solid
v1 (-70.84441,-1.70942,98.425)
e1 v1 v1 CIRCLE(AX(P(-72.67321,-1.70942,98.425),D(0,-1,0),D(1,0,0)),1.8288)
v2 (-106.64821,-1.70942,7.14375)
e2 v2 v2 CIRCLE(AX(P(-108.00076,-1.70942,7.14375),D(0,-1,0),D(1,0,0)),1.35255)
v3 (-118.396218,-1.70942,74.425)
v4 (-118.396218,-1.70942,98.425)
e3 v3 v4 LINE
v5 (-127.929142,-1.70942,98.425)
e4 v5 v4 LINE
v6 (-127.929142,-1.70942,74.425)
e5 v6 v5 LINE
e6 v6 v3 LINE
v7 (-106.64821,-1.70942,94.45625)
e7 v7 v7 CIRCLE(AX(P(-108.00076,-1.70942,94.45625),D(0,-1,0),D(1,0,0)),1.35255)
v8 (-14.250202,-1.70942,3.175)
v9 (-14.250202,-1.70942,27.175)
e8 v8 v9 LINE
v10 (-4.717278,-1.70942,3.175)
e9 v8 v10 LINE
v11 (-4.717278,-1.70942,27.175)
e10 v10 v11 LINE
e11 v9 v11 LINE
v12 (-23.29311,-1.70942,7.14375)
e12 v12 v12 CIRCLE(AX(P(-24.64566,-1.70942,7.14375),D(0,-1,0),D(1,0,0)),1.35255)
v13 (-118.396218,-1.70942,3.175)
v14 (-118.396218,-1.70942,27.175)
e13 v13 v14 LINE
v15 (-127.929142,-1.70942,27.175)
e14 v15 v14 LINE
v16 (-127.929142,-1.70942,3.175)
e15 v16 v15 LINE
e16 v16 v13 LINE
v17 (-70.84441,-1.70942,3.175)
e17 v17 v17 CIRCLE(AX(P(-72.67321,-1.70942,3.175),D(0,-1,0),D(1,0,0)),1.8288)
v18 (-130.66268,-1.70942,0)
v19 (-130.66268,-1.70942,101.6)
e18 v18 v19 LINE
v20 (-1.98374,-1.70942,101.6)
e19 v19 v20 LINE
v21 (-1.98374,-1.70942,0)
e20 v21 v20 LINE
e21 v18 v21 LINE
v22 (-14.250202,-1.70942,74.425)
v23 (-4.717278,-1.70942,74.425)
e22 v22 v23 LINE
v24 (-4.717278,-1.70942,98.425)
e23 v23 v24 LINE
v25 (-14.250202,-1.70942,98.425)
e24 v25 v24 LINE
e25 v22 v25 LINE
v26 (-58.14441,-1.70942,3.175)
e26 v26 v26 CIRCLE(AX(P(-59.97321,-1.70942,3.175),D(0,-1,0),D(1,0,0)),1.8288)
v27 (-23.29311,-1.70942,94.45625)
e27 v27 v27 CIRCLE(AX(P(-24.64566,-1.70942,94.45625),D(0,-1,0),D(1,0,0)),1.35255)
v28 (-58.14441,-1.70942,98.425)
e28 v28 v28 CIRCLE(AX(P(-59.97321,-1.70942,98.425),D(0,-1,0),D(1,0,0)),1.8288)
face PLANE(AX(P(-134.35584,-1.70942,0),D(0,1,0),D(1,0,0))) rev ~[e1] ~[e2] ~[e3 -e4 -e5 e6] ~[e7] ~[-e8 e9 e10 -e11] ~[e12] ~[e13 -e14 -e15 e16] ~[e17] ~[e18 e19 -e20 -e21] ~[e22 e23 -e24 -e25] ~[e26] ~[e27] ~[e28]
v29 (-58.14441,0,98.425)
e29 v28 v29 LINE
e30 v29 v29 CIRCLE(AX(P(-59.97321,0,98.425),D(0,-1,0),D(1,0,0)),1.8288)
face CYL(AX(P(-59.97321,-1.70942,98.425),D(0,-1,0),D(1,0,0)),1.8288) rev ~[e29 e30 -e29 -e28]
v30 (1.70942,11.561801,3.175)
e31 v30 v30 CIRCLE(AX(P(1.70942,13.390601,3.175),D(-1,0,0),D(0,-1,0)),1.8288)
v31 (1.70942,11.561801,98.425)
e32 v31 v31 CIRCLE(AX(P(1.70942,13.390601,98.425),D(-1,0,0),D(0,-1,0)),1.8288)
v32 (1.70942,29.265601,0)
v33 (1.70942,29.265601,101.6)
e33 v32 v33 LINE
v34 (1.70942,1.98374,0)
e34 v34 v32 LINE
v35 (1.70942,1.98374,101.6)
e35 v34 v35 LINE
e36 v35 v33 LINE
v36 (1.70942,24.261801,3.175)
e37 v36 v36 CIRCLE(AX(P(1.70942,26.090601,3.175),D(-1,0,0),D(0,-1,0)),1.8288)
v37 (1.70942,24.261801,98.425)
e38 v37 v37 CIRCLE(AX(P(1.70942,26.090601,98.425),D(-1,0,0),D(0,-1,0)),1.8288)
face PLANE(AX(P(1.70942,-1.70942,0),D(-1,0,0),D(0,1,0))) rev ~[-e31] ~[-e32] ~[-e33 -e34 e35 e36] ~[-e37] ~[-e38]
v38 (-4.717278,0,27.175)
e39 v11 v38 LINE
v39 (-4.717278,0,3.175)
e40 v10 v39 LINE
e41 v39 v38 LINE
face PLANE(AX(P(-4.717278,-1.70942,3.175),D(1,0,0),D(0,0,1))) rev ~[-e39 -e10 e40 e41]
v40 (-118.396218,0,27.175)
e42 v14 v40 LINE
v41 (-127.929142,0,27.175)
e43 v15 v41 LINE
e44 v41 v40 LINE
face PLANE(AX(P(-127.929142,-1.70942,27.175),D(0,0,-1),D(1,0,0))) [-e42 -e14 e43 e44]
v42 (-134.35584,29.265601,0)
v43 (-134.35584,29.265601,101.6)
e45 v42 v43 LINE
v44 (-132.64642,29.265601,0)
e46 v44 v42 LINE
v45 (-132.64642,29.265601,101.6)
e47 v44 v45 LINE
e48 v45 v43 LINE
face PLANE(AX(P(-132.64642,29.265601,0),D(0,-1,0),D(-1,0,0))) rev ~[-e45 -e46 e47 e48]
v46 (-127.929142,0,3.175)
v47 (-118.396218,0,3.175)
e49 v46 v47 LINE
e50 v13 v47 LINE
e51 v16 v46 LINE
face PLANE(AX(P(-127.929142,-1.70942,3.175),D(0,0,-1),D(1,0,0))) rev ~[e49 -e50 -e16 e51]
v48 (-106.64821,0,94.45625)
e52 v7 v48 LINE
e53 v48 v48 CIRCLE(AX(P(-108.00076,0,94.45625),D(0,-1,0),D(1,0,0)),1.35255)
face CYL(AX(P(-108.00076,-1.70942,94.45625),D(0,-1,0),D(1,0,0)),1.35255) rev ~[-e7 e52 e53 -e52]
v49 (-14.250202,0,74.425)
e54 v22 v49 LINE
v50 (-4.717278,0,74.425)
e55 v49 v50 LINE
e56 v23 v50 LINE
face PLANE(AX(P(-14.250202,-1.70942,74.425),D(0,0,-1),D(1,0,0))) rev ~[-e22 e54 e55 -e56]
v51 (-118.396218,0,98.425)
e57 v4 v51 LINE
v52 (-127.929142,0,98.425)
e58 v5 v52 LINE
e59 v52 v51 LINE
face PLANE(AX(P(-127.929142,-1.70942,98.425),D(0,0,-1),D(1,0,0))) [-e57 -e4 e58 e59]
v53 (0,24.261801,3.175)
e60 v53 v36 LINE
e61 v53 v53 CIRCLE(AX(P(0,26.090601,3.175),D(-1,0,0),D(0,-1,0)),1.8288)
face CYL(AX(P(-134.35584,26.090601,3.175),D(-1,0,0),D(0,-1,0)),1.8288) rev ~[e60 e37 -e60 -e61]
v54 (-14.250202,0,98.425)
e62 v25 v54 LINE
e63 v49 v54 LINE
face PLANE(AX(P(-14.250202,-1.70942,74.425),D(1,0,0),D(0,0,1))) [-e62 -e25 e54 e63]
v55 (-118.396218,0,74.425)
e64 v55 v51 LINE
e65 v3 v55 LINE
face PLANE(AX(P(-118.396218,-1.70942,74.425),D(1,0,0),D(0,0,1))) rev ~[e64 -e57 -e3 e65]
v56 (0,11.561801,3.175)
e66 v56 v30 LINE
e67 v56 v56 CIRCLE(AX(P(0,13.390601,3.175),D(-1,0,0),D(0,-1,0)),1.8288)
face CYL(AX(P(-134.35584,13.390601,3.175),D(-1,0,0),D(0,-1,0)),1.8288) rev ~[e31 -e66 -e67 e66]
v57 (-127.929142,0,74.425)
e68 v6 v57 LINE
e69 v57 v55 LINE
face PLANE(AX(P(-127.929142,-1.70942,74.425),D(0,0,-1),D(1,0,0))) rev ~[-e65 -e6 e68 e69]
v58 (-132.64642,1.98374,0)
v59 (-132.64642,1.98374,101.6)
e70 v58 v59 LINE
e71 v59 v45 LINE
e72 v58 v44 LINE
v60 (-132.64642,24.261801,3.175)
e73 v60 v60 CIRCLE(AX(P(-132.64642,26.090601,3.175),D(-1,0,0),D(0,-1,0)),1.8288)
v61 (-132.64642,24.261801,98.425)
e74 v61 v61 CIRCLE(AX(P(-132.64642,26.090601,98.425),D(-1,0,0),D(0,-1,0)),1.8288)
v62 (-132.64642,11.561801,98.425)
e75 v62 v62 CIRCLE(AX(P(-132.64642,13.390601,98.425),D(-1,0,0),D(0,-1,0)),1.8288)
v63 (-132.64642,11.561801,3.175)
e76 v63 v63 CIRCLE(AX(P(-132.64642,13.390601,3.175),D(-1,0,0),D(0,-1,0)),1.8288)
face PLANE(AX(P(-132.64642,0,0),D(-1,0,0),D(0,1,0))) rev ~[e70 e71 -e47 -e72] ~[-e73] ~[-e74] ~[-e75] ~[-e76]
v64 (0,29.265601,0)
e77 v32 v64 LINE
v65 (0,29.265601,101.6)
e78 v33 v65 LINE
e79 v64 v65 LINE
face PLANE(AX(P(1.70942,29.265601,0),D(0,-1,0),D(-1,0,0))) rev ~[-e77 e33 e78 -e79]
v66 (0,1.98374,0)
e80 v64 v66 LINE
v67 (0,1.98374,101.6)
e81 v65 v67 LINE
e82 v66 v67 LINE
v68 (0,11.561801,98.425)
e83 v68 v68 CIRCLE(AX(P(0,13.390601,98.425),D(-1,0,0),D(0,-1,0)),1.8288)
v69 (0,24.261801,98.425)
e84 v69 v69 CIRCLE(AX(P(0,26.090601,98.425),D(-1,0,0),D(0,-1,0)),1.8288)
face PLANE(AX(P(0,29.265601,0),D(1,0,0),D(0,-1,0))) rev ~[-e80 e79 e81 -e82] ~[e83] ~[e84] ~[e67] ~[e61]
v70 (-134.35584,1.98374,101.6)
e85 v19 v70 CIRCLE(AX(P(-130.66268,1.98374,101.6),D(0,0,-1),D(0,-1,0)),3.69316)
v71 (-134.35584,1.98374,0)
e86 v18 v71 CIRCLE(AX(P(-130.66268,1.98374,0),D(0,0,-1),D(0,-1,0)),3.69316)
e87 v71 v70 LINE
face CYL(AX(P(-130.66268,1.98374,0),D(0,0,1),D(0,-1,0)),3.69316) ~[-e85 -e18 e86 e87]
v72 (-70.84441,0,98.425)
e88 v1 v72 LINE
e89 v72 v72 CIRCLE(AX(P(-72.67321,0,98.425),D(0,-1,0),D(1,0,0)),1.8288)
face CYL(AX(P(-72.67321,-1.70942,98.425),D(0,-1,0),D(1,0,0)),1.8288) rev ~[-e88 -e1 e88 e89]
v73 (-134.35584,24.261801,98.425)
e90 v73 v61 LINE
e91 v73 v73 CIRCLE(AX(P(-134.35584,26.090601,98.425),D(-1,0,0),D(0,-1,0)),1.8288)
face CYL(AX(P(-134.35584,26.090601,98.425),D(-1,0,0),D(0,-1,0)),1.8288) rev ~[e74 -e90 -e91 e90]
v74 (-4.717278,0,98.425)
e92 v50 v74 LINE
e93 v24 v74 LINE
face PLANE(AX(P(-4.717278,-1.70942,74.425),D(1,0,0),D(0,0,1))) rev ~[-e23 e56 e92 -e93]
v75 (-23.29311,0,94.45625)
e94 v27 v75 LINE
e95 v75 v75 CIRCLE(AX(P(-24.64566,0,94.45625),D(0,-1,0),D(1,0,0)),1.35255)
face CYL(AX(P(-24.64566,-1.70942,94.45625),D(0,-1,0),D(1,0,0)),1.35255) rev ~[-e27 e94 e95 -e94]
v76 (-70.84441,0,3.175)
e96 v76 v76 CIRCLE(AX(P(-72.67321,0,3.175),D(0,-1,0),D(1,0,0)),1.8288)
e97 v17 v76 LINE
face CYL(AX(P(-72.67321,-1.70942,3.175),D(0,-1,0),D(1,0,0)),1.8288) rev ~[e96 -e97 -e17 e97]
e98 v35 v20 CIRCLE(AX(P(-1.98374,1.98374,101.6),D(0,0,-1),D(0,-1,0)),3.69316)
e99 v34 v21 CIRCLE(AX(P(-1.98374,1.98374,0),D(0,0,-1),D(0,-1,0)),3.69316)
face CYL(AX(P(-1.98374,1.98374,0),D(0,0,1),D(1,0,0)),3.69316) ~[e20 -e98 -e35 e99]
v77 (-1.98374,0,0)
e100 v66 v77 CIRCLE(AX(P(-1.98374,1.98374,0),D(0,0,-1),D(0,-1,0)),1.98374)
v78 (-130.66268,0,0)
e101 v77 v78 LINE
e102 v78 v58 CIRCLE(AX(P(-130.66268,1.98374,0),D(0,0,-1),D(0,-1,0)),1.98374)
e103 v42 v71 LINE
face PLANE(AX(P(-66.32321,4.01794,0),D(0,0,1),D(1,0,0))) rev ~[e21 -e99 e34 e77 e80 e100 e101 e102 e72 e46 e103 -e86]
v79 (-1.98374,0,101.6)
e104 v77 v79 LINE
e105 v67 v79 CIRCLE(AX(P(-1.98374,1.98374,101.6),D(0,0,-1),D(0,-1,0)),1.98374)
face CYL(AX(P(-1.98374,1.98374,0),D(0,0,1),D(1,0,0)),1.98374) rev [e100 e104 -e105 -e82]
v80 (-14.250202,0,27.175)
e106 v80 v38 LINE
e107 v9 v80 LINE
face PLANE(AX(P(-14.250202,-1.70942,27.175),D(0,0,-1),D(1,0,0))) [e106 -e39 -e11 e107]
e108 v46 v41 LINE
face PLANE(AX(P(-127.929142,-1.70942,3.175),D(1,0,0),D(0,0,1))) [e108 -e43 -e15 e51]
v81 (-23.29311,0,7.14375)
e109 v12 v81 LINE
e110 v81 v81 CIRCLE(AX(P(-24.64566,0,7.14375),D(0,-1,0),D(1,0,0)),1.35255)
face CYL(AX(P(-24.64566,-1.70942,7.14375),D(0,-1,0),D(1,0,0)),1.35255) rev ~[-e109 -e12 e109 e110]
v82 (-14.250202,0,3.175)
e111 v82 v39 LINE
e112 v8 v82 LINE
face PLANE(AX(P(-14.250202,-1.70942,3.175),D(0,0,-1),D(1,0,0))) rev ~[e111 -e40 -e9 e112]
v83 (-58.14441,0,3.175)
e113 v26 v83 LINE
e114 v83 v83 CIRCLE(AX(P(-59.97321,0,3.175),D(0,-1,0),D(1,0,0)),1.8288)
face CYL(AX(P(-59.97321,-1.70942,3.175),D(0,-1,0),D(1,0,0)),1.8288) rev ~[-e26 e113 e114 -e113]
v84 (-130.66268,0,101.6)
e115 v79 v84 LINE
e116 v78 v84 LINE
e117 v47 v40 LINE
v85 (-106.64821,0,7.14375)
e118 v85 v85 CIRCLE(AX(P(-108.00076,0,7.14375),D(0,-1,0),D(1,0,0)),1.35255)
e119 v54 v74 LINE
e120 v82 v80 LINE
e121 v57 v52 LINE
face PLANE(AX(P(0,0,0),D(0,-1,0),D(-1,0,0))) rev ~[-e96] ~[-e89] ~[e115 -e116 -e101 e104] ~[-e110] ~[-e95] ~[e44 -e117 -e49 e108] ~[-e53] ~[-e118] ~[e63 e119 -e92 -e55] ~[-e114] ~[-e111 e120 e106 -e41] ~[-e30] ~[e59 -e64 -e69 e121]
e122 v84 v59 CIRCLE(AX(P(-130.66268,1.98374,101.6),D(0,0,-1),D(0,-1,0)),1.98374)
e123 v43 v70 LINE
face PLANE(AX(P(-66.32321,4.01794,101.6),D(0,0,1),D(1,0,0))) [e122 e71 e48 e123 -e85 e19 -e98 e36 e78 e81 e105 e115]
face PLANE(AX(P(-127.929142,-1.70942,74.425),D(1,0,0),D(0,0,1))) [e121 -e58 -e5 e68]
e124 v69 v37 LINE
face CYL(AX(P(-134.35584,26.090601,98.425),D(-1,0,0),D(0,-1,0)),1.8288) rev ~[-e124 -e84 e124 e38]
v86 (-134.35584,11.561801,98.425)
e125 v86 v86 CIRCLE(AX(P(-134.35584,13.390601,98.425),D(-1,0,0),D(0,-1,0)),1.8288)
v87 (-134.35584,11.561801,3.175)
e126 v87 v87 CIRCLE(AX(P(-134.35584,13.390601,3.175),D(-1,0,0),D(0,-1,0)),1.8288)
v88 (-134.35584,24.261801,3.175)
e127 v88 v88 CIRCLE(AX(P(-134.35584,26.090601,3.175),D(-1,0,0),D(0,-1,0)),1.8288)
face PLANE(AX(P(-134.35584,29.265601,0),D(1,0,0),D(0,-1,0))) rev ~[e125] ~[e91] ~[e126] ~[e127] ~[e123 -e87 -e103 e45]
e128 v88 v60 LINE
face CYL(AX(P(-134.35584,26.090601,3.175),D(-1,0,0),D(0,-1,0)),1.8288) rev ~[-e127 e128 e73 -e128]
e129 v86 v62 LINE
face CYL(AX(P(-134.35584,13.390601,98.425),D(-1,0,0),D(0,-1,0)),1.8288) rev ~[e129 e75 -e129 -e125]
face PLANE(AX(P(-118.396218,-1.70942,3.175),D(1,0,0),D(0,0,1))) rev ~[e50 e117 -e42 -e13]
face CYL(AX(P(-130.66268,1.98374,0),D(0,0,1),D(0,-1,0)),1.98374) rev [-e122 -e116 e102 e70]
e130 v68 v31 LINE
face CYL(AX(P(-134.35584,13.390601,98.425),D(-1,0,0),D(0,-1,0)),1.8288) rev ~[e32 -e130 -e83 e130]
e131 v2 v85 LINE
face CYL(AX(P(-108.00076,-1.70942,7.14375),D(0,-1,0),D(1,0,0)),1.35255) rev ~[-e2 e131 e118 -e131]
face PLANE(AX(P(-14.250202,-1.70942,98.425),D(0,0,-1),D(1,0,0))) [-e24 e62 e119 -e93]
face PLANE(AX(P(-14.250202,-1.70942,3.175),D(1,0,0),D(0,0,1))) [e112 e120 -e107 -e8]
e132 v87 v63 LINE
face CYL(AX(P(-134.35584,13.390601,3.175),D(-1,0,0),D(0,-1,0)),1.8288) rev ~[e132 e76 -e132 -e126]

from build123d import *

# Parameters (mm, degrees)
F1_DEPTH = 101.6
F2_R     = 1.98374
F3_R     = 3.69316
F4_W     = 9.5329248
F4_H     = 24
F4_R     = 1.35255
F4_R_2   = 1.8288
F5_DEPTH = 257
F6_R     = 1.8288
F7_DEPTH = 136.06526


# Not quite as in the source:
# - an extrude ends at something that could not be found from the text; its depth is read off the source's solid


with BuildPart() as f1:
    # F0 (on Top) → F1 (new body)
    with BuildSketch(Plane.XY):
        Polygon((0, 29.2656006), (0, 0), (-132.64642, 0), (-132.64642, 29.2656006), (-134.35584, 29.2656006), (-134.35584, -1.70942), (1.70942, -1.70942), (1.70942, 29.2656006), align=None)
    extrude(amount=F1_DEPTH)

    # F2
    f2_edges = [f1.edges().sort_by_distance(p)[0] for p in [
        (0, 0, 50.8),
        (-132.64642, 0, 50.8),
    ]]
    fillet(f2_edges, radius=F2_R)

    # F3
    f3_edges = [f1.edges().sort_by_distance(p)[0] for p in [
        (-134.35584, -1.70942, 50.8),
        (1.70942, -1.70942, 50.8),
    ]]
    fillet(f3_edges, radius=F3_R)

    # F4 (on face) → F5 (cut, through all)
    with BuildSketch(Plane.XZ.offset(1.70942)):
        with Locations((-9.48374, 15.175)):
            Rectangle(F4_W, F4_H)
        with Locations((-123.16268, 15.175)):
            Rectangle(F4_W, F4_H)
        with Locations((-123.16268, 86.425)):
            Rectangle(F4_W, F4_H)
        with Locations((-9.48374, 86.425)):
            Rectangle(F4_W, F4_H)
        with Locations((-24.6456604, 7.14375)):
            Circle(F4_R)
        with Locations((-108.0007596, 7.14375)):
            Circle(F4_R)
        with Locations((-108.0007596, 94.45625)):
            Circle(F4_R)
        with Locations((-24.6456604, 94.45625)):
            Circle(F4_R)
        with Locations((-59.97321, 3.175)):
            Circle(F4_R_2)
        with Locations((-72.67321, 3.175)):
            Circle(F4_R_2)
        with Locations((-59.97321, 98.425)):
            Circle(F4_R_2)
        with Locations((-72.67321, 98.425)):
            Circle(F4_R_2)
    extrude(amount=-F5_DEPTH, mode=Mode.SUBTRACT)

    # F6 (on face) → F7 (cut, through all)
    with BuildSketch(Plane(origin=(-134.35584, 0, 0), x_dir=(0, -1, 0), z_dir=(-1, 0, 0))):
        with Locations((-26.0906006, 3.175)):
            Circle(F6_R)
        with Locations((-13.3906006, 3.175)):
            Circle(F6_R)
        with Locations((-13.3906006, 98.425)):
            Circle(F6_R)
        with Locations((-26.0906006, 98.425)):
            Circle(F6_R)
    extrude(amount=-F7_DEPTH, mode=Mode.SUBTRACT)


solid = f1.part
